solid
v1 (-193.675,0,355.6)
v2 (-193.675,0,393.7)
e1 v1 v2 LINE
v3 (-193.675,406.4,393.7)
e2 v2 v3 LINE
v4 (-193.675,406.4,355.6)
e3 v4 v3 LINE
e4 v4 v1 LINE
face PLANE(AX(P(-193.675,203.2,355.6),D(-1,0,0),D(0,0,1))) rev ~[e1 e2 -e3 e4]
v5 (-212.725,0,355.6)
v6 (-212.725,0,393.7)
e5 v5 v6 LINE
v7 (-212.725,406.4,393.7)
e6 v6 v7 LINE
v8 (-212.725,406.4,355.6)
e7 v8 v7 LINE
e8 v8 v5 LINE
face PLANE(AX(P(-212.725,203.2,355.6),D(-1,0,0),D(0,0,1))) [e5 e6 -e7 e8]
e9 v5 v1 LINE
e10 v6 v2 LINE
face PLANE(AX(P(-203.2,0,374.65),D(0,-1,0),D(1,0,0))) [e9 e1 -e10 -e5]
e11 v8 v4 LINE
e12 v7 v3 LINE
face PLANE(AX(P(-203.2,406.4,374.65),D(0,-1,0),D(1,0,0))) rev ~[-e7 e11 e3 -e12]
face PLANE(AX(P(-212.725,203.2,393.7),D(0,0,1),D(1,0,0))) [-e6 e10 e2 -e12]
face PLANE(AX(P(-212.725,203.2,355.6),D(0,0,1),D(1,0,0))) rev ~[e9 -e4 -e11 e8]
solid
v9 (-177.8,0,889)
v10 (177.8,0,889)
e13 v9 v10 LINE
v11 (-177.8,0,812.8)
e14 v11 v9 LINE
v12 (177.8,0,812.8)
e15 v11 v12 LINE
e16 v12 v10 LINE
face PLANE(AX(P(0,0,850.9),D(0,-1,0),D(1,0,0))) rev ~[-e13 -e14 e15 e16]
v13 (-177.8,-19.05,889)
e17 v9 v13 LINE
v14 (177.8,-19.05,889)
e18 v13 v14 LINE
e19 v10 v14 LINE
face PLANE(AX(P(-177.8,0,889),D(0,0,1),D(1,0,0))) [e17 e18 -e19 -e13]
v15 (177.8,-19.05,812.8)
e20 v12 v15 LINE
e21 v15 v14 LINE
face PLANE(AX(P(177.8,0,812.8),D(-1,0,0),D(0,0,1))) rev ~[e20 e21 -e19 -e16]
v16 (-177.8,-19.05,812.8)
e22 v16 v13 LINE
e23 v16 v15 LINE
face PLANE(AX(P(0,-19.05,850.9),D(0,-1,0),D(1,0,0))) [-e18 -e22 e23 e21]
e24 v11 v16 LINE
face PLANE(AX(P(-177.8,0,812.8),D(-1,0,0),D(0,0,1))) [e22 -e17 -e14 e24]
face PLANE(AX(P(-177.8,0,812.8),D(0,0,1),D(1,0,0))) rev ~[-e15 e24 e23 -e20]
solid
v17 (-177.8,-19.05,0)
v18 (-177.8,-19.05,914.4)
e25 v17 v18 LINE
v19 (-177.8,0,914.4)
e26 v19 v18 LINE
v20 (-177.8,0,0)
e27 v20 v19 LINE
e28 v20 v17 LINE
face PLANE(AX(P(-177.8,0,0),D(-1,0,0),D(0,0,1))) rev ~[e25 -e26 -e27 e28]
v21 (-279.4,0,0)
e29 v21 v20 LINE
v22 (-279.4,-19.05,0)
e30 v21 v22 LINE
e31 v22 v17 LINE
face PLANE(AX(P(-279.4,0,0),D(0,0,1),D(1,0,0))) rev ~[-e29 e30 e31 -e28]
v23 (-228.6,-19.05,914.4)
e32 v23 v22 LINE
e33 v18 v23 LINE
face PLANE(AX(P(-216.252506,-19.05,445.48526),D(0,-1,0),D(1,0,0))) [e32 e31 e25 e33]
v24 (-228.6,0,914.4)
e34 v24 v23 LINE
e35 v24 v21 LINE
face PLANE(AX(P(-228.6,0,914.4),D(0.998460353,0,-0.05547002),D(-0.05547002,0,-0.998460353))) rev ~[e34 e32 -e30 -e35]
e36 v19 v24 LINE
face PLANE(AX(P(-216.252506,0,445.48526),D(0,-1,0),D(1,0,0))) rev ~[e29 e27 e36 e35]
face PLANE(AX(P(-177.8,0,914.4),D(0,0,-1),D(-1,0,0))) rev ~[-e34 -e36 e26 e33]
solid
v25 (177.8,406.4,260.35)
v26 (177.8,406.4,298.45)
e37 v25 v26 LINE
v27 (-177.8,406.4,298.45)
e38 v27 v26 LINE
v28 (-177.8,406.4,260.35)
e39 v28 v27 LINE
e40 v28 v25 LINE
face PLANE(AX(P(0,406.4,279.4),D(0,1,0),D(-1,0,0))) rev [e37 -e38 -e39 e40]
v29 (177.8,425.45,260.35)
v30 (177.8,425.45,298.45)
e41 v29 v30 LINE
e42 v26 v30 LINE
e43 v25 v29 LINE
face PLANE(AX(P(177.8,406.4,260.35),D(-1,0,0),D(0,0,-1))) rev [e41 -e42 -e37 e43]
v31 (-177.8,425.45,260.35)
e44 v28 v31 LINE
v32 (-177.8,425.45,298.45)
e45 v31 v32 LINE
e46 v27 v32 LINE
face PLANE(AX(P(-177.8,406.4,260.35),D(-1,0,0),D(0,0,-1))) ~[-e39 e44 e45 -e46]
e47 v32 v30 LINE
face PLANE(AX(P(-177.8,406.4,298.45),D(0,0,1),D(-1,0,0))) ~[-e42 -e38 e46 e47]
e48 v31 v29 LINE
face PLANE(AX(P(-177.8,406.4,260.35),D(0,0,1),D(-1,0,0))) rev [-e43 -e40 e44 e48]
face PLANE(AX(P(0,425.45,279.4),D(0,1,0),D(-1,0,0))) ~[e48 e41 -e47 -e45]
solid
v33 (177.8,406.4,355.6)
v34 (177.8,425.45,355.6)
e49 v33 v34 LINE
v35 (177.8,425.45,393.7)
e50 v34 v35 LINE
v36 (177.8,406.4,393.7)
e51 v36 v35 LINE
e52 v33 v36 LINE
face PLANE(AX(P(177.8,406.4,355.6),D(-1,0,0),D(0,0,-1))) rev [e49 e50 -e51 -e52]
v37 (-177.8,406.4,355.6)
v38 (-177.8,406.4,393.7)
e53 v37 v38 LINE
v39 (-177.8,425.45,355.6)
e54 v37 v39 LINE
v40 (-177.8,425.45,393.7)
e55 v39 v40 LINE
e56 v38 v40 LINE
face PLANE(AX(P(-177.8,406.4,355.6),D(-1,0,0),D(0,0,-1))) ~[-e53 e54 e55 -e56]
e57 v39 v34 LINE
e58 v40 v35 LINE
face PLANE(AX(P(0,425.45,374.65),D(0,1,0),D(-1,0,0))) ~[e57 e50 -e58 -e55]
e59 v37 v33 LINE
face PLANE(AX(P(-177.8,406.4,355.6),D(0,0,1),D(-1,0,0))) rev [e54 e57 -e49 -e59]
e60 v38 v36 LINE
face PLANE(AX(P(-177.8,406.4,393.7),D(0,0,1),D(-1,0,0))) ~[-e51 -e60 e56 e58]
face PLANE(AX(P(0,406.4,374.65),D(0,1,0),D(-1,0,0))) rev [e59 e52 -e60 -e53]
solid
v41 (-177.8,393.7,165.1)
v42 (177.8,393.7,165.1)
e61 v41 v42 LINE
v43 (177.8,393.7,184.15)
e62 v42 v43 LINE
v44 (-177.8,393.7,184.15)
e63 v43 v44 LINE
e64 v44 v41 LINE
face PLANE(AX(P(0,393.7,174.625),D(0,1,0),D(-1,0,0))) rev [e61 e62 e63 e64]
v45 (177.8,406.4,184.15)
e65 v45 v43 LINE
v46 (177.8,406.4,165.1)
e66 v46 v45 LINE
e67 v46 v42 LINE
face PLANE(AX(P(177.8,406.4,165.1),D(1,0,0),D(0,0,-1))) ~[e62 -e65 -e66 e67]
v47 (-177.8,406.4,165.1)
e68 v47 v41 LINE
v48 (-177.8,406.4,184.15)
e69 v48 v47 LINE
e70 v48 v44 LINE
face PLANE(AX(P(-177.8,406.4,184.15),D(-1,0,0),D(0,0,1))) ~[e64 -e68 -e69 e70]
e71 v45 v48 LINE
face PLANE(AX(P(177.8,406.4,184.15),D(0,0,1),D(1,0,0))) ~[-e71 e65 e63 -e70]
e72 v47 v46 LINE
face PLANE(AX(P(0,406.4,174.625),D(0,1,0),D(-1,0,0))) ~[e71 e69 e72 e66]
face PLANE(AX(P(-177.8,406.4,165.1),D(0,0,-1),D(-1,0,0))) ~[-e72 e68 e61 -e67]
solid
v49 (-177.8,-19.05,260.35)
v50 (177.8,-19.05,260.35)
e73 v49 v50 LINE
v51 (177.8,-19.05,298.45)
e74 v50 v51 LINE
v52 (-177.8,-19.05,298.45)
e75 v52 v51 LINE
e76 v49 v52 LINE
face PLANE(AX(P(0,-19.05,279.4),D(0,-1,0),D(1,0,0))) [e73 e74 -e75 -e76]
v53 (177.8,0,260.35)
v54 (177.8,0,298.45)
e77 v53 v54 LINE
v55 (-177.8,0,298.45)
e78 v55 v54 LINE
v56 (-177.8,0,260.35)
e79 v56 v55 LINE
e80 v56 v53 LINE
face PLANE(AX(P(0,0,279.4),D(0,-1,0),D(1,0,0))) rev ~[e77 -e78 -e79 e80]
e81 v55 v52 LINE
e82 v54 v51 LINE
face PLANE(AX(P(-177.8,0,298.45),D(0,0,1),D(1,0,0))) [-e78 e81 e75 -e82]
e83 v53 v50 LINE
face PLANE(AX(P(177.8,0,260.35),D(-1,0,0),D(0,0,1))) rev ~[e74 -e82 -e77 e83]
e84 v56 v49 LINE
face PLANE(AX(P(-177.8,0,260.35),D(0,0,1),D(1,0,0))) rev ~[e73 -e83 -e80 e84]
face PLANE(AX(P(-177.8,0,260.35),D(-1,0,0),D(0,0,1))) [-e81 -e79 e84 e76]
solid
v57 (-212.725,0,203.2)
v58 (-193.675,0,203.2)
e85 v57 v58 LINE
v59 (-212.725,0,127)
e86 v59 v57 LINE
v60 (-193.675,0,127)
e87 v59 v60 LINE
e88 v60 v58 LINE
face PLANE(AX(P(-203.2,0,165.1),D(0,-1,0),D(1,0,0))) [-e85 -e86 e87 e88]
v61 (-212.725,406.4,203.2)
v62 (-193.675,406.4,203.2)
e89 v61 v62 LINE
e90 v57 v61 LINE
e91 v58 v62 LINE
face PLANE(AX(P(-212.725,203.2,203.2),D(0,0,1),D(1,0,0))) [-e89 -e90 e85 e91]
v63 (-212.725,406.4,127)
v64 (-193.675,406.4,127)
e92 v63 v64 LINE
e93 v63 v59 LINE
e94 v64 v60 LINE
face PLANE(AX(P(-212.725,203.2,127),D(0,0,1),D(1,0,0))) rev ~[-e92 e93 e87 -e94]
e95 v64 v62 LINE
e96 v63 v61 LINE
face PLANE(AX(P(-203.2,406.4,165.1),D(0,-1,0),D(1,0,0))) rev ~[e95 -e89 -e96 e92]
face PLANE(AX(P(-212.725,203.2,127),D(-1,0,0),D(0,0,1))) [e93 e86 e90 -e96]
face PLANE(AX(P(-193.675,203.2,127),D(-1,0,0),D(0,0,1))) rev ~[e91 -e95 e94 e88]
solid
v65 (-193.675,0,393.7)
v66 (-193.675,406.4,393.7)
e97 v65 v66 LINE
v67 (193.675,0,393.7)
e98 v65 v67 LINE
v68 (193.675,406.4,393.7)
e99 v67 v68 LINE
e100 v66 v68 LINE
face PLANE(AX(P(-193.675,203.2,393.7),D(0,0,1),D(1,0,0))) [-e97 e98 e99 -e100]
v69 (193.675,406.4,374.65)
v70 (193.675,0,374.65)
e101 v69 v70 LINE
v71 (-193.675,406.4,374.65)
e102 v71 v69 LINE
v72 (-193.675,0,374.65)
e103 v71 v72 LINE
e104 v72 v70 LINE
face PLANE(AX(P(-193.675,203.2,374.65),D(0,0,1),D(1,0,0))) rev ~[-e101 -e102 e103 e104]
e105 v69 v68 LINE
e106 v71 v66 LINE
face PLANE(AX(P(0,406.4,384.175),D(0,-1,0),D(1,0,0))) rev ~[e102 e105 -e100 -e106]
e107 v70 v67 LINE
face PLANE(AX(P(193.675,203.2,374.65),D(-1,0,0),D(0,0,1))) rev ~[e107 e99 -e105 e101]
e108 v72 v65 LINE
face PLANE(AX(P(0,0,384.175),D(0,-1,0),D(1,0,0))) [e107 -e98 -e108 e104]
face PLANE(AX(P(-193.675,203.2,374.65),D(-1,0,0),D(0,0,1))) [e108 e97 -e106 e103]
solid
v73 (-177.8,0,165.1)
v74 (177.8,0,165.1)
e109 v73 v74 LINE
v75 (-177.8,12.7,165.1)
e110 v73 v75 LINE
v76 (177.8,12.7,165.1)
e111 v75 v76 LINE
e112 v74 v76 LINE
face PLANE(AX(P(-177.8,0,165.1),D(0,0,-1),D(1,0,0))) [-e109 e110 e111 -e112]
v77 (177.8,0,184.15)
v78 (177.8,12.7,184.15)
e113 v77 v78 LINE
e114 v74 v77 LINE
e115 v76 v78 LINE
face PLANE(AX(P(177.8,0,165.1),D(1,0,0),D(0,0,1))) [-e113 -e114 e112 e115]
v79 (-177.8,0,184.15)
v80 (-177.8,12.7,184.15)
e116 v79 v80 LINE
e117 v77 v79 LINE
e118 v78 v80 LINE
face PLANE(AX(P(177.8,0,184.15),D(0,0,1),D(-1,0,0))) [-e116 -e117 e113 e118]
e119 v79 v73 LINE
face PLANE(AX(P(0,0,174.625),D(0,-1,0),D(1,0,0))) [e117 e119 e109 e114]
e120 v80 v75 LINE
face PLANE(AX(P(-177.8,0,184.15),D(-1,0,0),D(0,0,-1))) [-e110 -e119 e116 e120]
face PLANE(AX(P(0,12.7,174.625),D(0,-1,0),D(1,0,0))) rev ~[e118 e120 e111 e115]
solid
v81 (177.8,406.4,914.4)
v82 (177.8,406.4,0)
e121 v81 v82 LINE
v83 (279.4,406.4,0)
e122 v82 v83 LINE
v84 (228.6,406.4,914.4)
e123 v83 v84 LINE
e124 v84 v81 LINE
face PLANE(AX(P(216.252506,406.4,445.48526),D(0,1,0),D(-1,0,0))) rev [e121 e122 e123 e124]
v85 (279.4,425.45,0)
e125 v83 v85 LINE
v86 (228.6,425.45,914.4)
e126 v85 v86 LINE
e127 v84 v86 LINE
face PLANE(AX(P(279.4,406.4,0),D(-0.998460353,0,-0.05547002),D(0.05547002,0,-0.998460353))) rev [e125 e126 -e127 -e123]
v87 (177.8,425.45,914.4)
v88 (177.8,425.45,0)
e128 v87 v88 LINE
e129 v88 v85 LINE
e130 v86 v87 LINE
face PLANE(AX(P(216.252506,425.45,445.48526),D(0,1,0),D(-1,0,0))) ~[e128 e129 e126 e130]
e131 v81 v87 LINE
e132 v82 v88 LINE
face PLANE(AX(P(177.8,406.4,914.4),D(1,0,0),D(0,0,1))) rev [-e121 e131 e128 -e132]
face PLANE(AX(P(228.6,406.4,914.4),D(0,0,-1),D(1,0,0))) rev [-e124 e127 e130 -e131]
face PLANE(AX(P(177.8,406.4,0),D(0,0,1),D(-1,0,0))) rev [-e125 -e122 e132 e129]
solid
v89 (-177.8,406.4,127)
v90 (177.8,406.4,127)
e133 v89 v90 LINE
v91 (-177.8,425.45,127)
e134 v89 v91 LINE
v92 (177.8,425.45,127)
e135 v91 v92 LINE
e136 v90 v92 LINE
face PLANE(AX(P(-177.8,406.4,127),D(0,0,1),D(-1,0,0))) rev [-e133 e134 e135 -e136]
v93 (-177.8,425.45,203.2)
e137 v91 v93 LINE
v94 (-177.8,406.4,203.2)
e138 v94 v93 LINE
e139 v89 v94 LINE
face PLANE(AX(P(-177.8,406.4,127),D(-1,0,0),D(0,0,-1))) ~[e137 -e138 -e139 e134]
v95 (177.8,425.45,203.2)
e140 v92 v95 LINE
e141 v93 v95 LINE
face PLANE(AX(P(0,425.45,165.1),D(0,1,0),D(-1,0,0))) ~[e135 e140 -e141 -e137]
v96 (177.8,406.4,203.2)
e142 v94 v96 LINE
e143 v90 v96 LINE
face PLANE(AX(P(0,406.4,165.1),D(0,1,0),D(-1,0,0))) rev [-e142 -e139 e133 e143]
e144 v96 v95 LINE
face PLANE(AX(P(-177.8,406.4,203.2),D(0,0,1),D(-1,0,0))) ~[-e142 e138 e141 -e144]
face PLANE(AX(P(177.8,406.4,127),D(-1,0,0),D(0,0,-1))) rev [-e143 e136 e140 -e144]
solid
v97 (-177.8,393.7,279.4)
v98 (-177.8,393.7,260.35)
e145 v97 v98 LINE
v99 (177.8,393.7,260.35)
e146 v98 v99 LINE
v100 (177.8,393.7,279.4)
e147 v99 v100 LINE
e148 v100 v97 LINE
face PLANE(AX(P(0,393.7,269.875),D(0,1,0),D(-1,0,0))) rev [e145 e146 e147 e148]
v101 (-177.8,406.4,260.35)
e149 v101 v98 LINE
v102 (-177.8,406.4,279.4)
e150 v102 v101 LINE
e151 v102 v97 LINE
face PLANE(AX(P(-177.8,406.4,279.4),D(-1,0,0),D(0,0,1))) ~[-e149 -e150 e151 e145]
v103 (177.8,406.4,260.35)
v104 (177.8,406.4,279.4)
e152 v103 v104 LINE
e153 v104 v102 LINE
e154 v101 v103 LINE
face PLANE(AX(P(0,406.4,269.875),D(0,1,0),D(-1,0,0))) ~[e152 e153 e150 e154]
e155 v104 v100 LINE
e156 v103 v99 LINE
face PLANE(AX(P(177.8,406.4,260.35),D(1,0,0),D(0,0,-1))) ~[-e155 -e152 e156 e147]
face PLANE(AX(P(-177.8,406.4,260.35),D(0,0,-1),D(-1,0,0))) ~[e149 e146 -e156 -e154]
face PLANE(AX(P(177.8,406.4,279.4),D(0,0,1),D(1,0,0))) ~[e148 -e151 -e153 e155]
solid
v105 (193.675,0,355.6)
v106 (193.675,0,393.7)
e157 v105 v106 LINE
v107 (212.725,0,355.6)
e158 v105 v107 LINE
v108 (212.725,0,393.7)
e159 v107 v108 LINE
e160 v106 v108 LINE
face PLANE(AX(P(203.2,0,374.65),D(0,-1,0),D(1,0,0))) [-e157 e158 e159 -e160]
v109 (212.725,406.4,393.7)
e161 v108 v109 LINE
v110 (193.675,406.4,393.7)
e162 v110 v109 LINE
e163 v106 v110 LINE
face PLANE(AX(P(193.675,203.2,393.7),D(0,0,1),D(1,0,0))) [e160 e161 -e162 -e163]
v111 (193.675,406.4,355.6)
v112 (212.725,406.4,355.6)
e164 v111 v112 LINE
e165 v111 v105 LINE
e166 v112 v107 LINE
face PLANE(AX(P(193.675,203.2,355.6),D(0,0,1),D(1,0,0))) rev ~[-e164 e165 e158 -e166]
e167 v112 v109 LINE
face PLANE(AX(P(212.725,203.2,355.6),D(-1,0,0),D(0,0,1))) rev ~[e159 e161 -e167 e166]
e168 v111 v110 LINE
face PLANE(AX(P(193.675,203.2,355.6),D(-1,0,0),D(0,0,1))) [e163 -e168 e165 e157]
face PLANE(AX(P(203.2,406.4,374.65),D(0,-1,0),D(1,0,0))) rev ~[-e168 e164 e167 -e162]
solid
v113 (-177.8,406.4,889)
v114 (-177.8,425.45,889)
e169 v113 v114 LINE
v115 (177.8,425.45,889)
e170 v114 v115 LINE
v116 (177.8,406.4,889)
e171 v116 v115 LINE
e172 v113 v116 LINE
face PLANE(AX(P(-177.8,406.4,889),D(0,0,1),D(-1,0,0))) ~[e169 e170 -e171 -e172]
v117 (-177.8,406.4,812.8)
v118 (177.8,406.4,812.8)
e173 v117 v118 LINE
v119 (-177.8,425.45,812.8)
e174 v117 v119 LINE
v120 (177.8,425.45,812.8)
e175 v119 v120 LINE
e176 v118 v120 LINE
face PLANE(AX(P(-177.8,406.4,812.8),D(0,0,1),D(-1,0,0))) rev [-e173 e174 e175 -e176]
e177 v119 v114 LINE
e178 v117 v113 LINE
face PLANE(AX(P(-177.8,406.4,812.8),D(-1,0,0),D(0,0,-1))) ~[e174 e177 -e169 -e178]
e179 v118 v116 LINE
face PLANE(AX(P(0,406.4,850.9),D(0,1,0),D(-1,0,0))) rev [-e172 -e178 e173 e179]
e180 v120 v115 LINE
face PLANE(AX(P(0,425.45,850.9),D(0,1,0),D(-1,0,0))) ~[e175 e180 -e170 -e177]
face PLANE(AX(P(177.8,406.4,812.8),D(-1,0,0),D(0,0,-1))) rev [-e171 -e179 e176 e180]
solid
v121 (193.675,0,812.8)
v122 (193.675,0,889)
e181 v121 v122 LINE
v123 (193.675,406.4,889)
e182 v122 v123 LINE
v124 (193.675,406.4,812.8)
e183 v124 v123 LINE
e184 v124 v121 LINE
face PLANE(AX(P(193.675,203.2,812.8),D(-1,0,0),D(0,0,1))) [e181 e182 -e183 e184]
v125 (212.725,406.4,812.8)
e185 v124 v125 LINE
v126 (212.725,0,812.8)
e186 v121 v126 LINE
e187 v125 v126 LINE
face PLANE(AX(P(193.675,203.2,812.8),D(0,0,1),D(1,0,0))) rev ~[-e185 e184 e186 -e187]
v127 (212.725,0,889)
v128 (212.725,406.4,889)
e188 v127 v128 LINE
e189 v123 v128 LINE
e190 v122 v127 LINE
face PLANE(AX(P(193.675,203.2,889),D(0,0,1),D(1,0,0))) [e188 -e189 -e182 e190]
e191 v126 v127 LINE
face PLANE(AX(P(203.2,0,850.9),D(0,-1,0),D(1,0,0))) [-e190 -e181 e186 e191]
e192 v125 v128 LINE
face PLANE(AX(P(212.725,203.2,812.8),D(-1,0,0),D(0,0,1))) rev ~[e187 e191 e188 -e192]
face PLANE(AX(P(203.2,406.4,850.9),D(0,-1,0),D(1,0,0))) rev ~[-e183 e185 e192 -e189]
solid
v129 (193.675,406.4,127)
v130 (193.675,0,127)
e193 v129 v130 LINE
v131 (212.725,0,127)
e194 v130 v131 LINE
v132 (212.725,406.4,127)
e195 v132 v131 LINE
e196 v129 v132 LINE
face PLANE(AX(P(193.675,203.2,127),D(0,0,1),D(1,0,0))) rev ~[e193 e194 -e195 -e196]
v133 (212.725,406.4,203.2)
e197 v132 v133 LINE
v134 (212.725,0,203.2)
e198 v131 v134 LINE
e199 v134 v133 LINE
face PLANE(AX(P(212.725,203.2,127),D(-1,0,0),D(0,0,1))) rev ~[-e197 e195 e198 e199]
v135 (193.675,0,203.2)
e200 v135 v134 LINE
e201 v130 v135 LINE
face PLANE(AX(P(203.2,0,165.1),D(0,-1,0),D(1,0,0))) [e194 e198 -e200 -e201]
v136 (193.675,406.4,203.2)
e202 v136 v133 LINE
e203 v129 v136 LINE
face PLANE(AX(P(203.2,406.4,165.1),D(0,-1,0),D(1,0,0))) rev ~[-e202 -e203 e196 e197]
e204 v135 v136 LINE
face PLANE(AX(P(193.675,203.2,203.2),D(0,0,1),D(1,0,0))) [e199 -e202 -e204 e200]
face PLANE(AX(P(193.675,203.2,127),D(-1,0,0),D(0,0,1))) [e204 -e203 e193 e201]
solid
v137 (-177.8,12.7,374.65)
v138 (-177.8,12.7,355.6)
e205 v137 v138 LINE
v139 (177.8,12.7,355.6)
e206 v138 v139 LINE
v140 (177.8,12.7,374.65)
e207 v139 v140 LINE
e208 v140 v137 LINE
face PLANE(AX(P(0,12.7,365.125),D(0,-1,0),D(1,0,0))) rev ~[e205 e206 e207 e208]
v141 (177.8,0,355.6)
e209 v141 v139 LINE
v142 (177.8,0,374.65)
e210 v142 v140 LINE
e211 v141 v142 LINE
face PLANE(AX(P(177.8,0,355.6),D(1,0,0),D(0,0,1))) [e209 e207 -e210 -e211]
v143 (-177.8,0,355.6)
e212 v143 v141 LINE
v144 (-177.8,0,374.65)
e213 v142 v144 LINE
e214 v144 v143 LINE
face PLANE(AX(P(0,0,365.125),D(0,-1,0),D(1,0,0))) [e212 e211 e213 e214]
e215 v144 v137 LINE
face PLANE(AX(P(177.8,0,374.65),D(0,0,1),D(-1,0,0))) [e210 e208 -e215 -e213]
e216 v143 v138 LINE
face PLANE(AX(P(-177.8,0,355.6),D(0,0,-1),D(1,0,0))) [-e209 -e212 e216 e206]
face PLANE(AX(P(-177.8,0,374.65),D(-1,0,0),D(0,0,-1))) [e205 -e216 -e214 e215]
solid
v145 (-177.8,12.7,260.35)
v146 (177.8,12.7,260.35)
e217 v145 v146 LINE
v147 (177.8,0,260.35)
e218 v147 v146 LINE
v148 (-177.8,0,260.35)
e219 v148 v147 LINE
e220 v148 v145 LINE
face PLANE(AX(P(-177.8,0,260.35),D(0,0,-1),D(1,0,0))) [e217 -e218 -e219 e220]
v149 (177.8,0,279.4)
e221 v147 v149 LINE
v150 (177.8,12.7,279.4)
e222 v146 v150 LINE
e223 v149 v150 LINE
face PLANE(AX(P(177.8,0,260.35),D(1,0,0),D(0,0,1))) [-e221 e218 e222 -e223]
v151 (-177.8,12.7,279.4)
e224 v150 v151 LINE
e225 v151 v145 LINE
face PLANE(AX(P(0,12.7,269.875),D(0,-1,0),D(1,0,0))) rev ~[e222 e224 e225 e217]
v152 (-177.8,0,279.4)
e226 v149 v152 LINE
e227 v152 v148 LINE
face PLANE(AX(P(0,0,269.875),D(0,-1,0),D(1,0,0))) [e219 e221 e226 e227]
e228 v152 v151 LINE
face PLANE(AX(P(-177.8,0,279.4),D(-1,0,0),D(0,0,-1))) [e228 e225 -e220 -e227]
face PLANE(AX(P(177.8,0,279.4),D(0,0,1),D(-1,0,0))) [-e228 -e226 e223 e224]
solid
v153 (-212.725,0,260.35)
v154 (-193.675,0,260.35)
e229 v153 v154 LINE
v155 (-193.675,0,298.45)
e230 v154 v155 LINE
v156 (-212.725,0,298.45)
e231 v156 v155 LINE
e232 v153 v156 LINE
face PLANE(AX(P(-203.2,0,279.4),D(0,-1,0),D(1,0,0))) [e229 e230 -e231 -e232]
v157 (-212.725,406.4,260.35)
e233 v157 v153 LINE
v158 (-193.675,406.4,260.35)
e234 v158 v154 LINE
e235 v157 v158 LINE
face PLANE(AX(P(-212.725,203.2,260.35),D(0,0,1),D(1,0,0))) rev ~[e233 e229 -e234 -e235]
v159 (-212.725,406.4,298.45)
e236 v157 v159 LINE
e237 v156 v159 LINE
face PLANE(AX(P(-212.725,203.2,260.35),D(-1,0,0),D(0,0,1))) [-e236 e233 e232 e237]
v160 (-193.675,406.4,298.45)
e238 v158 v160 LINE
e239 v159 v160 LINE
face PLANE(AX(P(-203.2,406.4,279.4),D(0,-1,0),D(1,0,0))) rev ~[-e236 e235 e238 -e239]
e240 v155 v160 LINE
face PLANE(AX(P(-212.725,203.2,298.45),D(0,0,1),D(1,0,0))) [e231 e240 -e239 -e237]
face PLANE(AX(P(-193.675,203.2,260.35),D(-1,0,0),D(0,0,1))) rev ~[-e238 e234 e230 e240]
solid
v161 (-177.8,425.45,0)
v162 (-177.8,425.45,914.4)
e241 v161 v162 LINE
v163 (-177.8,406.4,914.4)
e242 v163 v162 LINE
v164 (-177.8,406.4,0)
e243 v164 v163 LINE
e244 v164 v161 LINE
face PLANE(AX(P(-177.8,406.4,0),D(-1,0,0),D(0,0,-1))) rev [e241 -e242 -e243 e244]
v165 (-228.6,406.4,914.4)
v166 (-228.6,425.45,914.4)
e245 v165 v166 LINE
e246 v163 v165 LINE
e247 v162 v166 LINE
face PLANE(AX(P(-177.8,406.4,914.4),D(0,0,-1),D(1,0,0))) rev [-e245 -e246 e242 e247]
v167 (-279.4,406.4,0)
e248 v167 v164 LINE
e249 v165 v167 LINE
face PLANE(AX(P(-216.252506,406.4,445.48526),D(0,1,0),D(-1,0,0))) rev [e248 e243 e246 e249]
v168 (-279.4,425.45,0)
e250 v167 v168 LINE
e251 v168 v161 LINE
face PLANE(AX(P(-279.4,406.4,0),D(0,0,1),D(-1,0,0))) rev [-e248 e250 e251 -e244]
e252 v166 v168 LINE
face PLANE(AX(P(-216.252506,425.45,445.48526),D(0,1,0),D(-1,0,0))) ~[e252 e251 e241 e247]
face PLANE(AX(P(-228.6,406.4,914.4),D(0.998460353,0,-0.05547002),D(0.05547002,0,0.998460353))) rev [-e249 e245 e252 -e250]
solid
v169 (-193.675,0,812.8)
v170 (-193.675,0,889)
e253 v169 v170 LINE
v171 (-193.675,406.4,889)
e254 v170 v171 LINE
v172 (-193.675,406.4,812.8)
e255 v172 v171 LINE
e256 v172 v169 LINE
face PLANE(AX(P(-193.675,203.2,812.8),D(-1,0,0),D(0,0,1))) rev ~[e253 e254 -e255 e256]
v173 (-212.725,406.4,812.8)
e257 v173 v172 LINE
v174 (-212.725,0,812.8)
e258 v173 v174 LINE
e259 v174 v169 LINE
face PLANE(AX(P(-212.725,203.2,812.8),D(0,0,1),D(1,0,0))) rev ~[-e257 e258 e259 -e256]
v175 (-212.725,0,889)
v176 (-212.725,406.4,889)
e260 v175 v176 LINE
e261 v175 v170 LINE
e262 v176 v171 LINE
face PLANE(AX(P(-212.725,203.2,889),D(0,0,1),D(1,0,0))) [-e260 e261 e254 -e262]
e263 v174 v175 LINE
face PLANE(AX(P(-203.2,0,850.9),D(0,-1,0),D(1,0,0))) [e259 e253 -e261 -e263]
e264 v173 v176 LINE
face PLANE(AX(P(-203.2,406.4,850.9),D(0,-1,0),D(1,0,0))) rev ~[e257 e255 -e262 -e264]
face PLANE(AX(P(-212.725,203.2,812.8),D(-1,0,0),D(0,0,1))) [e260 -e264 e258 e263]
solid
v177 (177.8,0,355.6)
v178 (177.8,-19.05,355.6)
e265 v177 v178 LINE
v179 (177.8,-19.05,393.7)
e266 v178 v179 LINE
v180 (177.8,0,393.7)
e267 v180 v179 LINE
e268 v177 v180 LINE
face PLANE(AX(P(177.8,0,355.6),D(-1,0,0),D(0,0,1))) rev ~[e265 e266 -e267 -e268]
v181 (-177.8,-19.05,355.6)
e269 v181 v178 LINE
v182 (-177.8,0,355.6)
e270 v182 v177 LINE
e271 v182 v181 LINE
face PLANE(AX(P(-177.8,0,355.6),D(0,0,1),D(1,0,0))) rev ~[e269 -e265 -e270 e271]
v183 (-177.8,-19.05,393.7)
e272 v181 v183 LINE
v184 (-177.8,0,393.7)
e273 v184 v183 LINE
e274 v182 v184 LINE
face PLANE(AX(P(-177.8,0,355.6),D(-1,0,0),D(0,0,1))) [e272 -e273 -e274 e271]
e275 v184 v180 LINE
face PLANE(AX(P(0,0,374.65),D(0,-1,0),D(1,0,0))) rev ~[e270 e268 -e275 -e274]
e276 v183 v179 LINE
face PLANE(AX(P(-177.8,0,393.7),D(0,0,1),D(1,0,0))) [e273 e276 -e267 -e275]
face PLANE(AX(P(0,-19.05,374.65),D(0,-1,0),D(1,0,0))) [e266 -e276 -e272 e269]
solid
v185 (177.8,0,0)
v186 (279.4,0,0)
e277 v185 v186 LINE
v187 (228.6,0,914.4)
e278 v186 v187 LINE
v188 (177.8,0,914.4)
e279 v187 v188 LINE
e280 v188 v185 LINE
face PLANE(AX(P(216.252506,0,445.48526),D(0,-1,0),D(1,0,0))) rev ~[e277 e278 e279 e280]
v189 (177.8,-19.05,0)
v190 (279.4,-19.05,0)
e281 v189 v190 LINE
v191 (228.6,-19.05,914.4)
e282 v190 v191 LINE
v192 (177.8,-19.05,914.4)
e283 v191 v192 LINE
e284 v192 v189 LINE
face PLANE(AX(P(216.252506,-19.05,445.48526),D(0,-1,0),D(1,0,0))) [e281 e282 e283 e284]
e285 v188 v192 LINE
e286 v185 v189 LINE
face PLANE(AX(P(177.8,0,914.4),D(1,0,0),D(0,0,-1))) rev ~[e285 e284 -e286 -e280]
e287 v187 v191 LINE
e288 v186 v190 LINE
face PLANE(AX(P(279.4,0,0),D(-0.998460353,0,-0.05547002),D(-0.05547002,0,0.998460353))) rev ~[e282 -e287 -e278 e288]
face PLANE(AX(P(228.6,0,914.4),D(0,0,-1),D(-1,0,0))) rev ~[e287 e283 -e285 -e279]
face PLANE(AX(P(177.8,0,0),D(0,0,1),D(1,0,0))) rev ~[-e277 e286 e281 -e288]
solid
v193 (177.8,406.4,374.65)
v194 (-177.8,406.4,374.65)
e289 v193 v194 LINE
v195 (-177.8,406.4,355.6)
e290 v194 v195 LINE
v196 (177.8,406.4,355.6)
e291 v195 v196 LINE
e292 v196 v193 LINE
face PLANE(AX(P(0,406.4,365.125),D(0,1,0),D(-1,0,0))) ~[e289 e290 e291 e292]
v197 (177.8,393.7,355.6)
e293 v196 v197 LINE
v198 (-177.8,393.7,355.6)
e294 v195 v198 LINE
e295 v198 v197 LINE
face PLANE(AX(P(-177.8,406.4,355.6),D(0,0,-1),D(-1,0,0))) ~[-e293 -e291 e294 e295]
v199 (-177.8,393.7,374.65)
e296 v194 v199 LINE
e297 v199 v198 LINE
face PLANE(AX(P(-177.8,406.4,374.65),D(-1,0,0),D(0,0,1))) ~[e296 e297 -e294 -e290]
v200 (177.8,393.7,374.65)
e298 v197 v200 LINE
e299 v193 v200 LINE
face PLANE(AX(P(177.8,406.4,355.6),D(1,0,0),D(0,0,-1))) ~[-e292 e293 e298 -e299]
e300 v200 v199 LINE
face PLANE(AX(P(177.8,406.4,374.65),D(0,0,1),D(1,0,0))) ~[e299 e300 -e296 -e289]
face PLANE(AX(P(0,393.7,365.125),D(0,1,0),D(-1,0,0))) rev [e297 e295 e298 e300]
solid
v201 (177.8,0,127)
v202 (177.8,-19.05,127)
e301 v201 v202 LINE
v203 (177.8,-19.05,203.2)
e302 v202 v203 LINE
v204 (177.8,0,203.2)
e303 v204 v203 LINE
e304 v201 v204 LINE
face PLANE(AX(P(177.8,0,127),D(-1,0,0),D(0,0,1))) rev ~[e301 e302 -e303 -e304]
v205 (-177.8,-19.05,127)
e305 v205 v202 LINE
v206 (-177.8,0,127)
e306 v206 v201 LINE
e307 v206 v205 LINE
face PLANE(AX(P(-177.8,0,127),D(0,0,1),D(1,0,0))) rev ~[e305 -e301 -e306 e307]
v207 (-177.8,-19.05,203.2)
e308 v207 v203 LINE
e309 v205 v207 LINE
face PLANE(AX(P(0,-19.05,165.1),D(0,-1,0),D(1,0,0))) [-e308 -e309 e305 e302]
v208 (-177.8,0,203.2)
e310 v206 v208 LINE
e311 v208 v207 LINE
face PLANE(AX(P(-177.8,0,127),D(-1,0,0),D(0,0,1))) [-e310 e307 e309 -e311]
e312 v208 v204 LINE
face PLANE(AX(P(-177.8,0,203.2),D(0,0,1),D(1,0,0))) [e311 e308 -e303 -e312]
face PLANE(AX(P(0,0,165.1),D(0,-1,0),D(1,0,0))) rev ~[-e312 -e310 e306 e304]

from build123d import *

# Parameters (mm, degrees)
F1_DEPTH       = 19.05
F0_W           = 355.6
F0_H           = 76.2
F2_DEPTH       = 19.05
F0_H_2         = 38.1
F4_DEPTH       = 12.7
F7_W           = 19.05
F7_H           = 76.2
F8_DEPTH       = 203.2
F8_DEPTH_BACK  = 203.2
F7_H_2         = 38.1
F9_W           = 387.35
F9_H           = 19.05
F10_DEPTH      = 203.2
F10_DEPTH_BACK = 203.2


with BuildPart() as f1:
    # F0 (on Front) → F1 (new body)
    with BuildSketch(Plane.XZ):
        Polygon((-228.6, 914.4), (-279.4, 0), (-177.8, 0), (-177.8, 127), (-177.8, 203.2), (-177.8, 260.35), (-177.8, 298.45), (-177.8, 355.6), (-177.8, 393.7), (-177.8, 812.8), (-177.8, 889), (-177.8, 914.4), align=None)
    extrude(amount=F1_DEPTH)


with BuildPart() as f1b:
    # F0 (on Front) → F1, piece 2 (new body)
    with BuildSketch(Plane.XZ):
        Polygon((177.8, 203.2), (177.8, 127), (177.8, 0), (279.4, 0), (228.6, 914.4), (177.8, 914.4), (177.8, 889), (177.8, 812.8), (177.8, 393.7), (177.8, 355.6), (177.8, 298.45), (177.8, 260.35), align=None)
    extrude(amount=F1_DEPTH)


with BuildPart() as f2:
    # F0 (on Front) → F2 (new body)
    with BuildSketch(Plane.XZ):
        with Locations((0, 850.9)):
            Rectangle(F0_W, F0_H)
    extrude(amount=F2_DEPTH)


with BuildPart() as f2b:
    # F0 (on Front) → F2, piece 2 (new body)
    with BuildSketch(Plane.XZ):
        with Locations((0, 374.65)):
            Rectangle(F0_W, F0_H_2)
    extrude(amount=F2_DEPTH)


with BuildPart() as f2c:
    # F0 (on Front) → F2, piece 3 (new body)
    with BuildSketch(Plane.XZ):
        with Locations((0, 279.4)):
            Rectangle(F0_W, F0_H_2)
    extrude(amount=F2_DEPTH)


with BuildPart() as f2d:
    # F0 (on Front) → F2, piece 4 (new body)
    with BuildSketch(Plane.XZ):
        with Locations((0, 165.1)):
            Rectangle(F0_W, F0_H)
    extrude(amount=F2_DEPTH)


with BuildPart() as f4:
    # F3 (on Front) → F4 (new body)
    with BuildSketch(Plane.XZ):
        Polygon((177.8, 355.6), (177.8, 374.65), (0, 374.65), (-177.8, 374.65), (-177.8, 355.6), (0, 355.6), align=None)
    extrude(amount=-F4_DEPTH)


with BuildPart() as f4b:
    # F3 (on Front) → F4, piece 2 (new body)
    with BuildSketch(Plane.XZ):
        Polygon((177.8, 260.35), (177.8, 279.4), (0, 279.4), (-177.8, 279.4), (-177.8, 260.35), (0, 260.35), align=None)
    extrude(amount=-F4_DEPTH)


with BuildPart() as f4c:
    # F3 (on Front) → F4, piece 3 (new body)
    with BuildSketch(Plane.XZ):
        Polygon((177.8, 165.1), (177.8, 184.15), (0, 184.15), (-177.8, 184.15), (-177.8, 165.1), (0, 165.1), align=None)
    extrude(amount=-F4_DEPTH)


with BuildPart() as f6_1:
    # F6: instance of F2
    add(f2.part.mirror(Plane.XZ.offset(-203.2)))


with BuildPart() as f6_2:
    # F6: instance of F2c
    add(f2c.part.mirror(Plane.XZ.offset(-203.2)))


with BuildPart() as f6_3:
    # F6: instance of F2d
    add(f2d.part.mirror(Plane.XZ.offset(-203.2)))


with BuildPart() as f6_4:
    # F6: instance of F4
    add(f4.part.mirror(Plane.XZ.offset(-203.2)))


with BuildPart() as f6_5:
    # F6: instance of F2b
    add(f2b.part.mirror(Plane.XZ.offset(-203.2)))


with BuildPart() as f6_6:
    # F6: instance of F1b
    add(f1b.part.mirror(Plane.XZ.offset(-203.2)))


with BuildPart() as f6_7:
    # F6: instance of F1
    add(f1.part.mirror(Plane.XZ.offset(-203.2)))


with BuildPart() as f6_8:
    # F6: instance of F4c
    add(f4c.part.mirror(Plane.XZ.offset(-203.2)))


with BuildPart() as f6_9:
    # F6: instance of F4b
    add(f4b.part.mirror(Plane.XZ.offset(-203.2)))


with BuildPart() as f8:
    # F7 (on offset) → F8 (new body, two sides)
    with BuildSketch(Plane.XZ.offset(-203.2)) as f8_sk:
        with Locations((203.2, 850.9)):
            Rectangle(F7_W, F7_H)
    extrude(amount=-F8_DEPTH)
    extrude(f8_sk.sketch, amount=F8_DEPTH_BACK)


with BuildPart() as f8b:
    # F7 (on offset) → F8, piece 2 (new body, two sides)
    with BuildSketch(Plane.XZ.offset(-203.2)) as f8_2_sk:
        with Locations((-203.2, 850.9)):
            Rectangle(F7_W, F7_H)
    extrude(amount=-F8_DEPTH)
    extrude(f8_2_sk.sketch, amount=F8_DEPTH_BACK)


with BuildPart() as f8c:
    # F7 (on offset) → F8, piece 3 (new body, two sides)
    with BuildSketch(Plane.XZ.offset(-203.2)) as f8_3_sk:
        with Locations((-203.2, 374.65)):
            Rectangle(F7_W, F7_H_2)
    extrude(amount=-F8_DEPTH)
    extrude(f8_3_sk.sketch, amount=F8_DEPTH_BACK)


with BuildPart() as f8d:
    # F7 (on offset) → F8, piece 4 (new body, two sides)
    with BuildSketch(Plane.XZ.offset(-203.2)) as f8_4_sk:
        with Locations((-203.2, 279.4)):
            Rectangle(F7_W, F7_H_2)
    extrude(amount=-F8_DEPTH)
    extrude(f8_4_sk.sketch, amount=F8_DEPTH_BACK)


with BuildPart() as f8e:
    # F7 (on offset) → F8, piece 5 (new body, two sides)
    with BuildSketch(Plane.XZ.offset(-203.2)) as f8_5_sk:
        with Locations((-203.2, 165.1)):
            Rectangle(F7_W, F7_H)
    extrude(amount=-F8_DEPTH)
    extrude(f8_5_sk.sketch, amount=F8_DEPTH_BACK)


with BuildPart() as f8f:
    # F7 (on offset) → F8, piece 6 (new body, two sides)
    with BuildSketch(Plane.XZ.offset(-203.2)) as f8_6_sk:
        with Locations((203.2, 165.1)):
            Rectangle(F7_W, F7_H)
    extrude(amount=-F8_DEPTH)
    extrude(f8_6_sk.sketch, amount=F8_DEPTH_BACK)


with BuildPart() as f8g:
    # F7 (on offset) → F8, piece 7 (new body, two sides)
    with BuildSketch(Plane.XZ.offset(-203.2)) as f8_7_sk:
        with Locations((203.2, 374.65)):
            Rectangle(F7_W, F7_H_2)
    extrude(amount=-F8_DEPTH)
    extrude(f8_7_sk.sketch, amount=F8_DEPTH_BACK)


with BuildPart() as f10:
    # F9 (on offset) → F10 (new body, two sides)
    with BuildSketch(Plane.XZ.offset(-203.2)) as f10_sk:
        with Locations((0, 384.175)):
            Rectangle(F9_W, F9_H)
    extrude(amount=-F10_DEPTH)
    extrude(f10_sk.sketch, amount=F10_DEPTH_BACK)


solid = Compound([f1.part, f1b.part, f2.part, f2b.part, f2c.part, f2d.part, f4.part, f4b.part, f4c.part, f6_1.part, f6_2.part, f6_3.part, f6_4.part, f6_5.part, f6_6.part, f6_7.part, f6_8.part, f6_9.part, f8.part, f8b.part, f8c.part, f8d.part, f8e.part, f8f.part, f8g.part, f10.part])
